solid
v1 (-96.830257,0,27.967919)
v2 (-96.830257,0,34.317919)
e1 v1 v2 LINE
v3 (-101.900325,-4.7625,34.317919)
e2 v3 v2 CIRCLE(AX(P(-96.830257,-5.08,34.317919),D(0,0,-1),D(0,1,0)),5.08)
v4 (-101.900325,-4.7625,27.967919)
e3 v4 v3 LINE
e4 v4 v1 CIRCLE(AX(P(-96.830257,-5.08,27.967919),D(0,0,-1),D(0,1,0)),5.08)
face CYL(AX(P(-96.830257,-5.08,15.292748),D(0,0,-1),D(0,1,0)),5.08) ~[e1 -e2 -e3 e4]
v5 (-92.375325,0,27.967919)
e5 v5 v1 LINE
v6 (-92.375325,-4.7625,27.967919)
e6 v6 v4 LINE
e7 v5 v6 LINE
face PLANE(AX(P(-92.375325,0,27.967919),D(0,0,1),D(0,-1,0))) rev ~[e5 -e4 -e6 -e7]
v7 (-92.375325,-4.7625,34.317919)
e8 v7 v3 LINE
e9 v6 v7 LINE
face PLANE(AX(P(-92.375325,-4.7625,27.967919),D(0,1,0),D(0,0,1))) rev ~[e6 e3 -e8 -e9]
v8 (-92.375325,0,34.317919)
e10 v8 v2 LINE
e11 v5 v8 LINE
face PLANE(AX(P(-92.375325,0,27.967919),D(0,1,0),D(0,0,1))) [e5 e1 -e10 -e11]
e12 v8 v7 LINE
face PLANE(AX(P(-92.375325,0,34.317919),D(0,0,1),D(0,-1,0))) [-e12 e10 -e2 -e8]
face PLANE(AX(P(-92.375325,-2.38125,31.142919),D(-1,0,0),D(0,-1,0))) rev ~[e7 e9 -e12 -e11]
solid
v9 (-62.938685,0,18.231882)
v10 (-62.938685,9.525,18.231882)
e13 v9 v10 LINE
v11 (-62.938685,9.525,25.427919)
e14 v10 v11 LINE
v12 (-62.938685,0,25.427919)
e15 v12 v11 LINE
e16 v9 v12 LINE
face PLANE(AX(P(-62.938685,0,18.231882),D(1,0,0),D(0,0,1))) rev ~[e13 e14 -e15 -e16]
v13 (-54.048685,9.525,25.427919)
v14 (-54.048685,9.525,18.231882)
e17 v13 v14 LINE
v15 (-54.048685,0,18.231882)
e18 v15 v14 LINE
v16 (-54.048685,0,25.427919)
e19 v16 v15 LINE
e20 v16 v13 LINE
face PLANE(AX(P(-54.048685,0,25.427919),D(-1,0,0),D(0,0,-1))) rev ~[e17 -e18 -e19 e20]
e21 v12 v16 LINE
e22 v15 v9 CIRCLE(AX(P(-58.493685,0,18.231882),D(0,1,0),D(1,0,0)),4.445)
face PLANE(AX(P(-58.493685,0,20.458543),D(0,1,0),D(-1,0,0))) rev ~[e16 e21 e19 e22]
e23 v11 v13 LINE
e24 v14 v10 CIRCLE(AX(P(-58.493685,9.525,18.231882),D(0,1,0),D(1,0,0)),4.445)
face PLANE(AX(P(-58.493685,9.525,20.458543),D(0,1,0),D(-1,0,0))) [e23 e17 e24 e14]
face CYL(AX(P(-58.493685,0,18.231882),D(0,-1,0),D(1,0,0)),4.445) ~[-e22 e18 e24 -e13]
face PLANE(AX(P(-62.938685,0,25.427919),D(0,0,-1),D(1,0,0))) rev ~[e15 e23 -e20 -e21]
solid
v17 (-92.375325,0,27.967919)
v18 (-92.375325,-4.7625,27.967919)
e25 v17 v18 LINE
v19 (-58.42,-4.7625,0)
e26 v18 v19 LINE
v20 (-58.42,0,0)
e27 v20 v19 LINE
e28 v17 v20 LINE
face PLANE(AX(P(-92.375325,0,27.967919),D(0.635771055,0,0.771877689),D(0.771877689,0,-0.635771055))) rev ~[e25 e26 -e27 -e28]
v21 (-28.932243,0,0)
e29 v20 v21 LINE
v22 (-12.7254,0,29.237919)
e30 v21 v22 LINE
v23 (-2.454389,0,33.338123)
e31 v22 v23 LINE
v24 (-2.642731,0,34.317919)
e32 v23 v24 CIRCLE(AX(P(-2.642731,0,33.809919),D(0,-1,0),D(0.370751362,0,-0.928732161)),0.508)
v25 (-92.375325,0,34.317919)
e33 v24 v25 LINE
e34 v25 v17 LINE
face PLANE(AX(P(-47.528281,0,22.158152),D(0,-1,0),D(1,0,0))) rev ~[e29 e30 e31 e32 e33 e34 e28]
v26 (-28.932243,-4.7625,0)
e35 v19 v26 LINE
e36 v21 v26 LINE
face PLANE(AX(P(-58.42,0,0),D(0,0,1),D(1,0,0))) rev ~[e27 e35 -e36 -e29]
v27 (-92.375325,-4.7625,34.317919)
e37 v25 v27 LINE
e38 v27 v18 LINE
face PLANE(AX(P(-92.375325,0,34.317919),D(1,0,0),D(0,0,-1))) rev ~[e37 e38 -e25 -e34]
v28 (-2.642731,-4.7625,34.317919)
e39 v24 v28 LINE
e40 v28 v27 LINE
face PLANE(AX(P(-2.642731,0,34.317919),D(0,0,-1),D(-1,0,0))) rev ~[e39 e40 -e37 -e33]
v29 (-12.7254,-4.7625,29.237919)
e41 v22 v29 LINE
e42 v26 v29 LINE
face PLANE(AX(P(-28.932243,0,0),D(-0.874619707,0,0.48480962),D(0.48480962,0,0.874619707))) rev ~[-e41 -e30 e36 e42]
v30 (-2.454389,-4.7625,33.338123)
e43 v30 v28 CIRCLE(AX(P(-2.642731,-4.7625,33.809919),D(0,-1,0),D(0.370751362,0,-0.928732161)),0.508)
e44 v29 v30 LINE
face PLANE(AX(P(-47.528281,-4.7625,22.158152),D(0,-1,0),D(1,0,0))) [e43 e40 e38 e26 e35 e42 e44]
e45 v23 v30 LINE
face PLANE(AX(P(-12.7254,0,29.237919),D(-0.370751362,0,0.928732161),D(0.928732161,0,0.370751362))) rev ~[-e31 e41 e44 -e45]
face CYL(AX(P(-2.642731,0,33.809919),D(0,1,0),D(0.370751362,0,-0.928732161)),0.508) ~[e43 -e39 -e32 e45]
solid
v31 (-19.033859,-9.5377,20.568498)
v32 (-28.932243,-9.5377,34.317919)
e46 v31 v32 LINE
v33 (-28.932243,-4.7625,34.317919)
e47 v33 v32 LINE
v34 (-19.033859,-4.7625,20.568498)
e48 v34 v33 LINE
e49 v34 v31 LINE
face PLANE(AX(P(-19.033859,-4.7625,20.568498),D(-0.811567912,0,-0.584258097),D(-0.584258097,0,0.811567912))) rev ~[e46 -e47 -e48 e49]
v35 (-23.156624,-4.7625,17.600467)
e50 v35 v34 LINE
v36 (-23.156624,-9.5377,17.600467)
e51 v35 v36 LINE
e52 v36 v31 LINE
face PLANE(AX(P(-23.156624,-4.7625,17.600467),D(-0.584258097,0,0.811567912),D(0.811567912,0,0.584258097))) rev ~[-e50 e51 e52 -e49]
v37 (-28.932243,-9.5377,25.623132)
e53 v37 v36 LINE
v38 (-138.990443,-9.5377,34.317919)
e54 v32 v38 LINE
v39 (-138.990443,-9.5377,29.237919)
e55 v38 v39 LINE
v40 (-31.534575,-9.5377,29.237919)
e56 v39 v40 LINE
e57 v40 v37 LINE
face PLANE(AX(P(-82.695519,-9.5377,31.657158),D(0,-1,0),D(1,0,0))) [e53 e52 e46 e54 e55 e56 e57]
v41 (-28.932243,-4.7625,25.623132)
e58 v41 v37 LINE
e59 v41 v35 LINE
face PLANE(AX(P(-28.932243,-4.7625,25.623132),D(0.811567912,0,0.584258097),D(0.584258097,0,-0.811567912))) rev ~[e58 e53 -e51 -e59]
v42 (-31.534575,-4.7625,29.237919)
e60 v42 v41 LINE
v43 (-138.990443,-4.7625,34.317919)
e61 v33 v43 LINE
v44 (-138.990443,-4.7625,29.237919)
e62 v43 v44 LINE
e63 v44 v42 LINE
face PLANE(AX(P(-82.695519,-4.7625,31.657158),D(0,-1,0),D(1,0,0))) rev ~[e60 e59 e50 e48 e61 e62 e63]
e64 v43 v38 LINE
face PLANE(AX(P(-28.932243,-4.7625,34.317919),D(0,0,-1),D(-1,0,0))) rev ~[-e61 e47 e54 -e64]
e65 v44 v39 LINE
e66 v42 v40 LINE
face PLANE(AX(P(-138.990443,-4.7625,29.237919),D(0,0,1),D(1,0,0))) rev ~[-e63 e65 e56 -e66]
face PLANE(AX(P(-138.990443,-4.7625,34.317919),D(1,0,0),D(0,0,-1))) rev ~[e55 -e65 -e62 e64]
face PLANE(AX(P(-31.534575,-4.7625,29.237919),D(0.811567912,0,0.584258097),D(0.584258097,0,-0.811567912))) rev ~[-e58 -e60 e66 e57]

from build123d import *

# Parameters (mm, degrees)
F1_DEPTH    = 4.7625
F2_W        = 4.7625
F2_H        = 6.35
F3_DEPTH    = 9.525
F4_T1_DEPTH = 31.7003420835
F6_DEPTH    = 9.525
F8_DEPTH    = 4.7752


# Not quite as in the source:
# - a fillet or chamfer that OpenCascade refuses, or shapes differently, is made with other operations: its cross-section is extruded or revolved along the edge and cut away or added


with BuildPart() as f1:
    # F0 (on Front) → F1 (new body)
    with BuildSketch(Plane.XZ):
        with BuildLine():
            Line((-58.42, 0), (-28.9322432641, 0))
            Line((-28.9322432641, 0), (-12.7254, 29.2379192107))
            Line((-12.7254, 29.2379192107), (-2.4543888247, 33.3381232726))
            ThreePointArc((-2.4543888247, 33.3381232726), (-2.1438636322, 33.9058141101), (-2.6427305165, 34.3179192107))
            Line((-2.6427305165, 34.3179192107), (-12.7254, 34.3179192107))
            Line((-12.7254, 34.3179192107), (-28.8753250815, 34.3179192107))
            Line((-28.8753250815, 34.3179192107), (-92.3753250815, 34.3179192107))
            Line((-92.3753250815, 34.3179192107), (-92.3753250815, 27.9679192107))
            Line((-92.3753250815, 27.9679192107), (-58.42, 0))
        make_face()
    extrude(amount=F1_DEPTH)


with BuildPart() as f3:
    # F2 (on face) → F3 (new body)
    with BuildSketch(Plane(origin=(-92.3753250815, 0, 0), x_dir=(0, -1, 0), z_dir=(-1, 0, 0))):
        with Locations((2.38125, 31.1429192107)):
            Rectangle(F2_W, F2_H)
    extrude(amount=F3_DEPTH)

    # F4: fillet of radius 5.08 on 1 edges, made by hand

    # F4_s2 → F4_t1 (cut)
    with BuildSketch(Plane.XY.offset(15.2927481689)):
        with BuildLine():
            ThreePointArc((-96.8302566648, 0), (-100.308294905, -1.3773455468), (-101.9003250815, -4.7625))
            Line((-101.9003250815, -4.7625), (-101.9003250815, 0))
            Line((-101.9003250815, 0), (-96.8302566648, 0))
        make_face()
    extrude(amount=F4_T1_DEPTH, mode=Mode.SUBTRACT)


with BuildPart() as f6:
    # F5 (on face) → F6 (new body)
    with BuildSketch(Plane(origin=(0, 0, 0), x_dir=(-1, 0, 0), z_dir=(0, 1, 0))):
        with BuildLine():
            Line((54.0486851786, 25.4279192107), (54.0486851786, 18.2318821344))
            ThreePointArc((54.0486851786, 18.2318821344), (58.4936851786, 13.7868821344), (62.9386851786, 18.2318821344))
            Line((62.9386851786, 18.2318821344), (62.9386851786, 25.4279192107))
            Line((62.9386851786, 25.4279192107), (54.0486851786, 25.4279192107))
        make_face()
    extrude(amount=F6_DEPTH)


with BuildPart() as f8:
    # F7 (on face) → F8 (new body)
    with BuildSketch(Plane.XZ.offset(4.7625)):
        Polygon((-31.534574919, 29.2379192107), (-28.9322432641, 25.6231317048), (-28.9322432641, 34.3179192107), (-138.9904432641, 34.3179192107), (-138.9904432641, 29.2379192107), (-35.3291034698, 29.2379192107), align=None)
        Polygon((-28.9322432641, 34.3179192107), (-28.9322432641, 25.6231317048), (-23.1566244349, 17.6004668216), (-19.0338594402, 20.5684979532), align=None)
    extrude(amount=F8_DEPTH)


solid = Compound([f1.part, f3.part, f6.part, f8.part])
